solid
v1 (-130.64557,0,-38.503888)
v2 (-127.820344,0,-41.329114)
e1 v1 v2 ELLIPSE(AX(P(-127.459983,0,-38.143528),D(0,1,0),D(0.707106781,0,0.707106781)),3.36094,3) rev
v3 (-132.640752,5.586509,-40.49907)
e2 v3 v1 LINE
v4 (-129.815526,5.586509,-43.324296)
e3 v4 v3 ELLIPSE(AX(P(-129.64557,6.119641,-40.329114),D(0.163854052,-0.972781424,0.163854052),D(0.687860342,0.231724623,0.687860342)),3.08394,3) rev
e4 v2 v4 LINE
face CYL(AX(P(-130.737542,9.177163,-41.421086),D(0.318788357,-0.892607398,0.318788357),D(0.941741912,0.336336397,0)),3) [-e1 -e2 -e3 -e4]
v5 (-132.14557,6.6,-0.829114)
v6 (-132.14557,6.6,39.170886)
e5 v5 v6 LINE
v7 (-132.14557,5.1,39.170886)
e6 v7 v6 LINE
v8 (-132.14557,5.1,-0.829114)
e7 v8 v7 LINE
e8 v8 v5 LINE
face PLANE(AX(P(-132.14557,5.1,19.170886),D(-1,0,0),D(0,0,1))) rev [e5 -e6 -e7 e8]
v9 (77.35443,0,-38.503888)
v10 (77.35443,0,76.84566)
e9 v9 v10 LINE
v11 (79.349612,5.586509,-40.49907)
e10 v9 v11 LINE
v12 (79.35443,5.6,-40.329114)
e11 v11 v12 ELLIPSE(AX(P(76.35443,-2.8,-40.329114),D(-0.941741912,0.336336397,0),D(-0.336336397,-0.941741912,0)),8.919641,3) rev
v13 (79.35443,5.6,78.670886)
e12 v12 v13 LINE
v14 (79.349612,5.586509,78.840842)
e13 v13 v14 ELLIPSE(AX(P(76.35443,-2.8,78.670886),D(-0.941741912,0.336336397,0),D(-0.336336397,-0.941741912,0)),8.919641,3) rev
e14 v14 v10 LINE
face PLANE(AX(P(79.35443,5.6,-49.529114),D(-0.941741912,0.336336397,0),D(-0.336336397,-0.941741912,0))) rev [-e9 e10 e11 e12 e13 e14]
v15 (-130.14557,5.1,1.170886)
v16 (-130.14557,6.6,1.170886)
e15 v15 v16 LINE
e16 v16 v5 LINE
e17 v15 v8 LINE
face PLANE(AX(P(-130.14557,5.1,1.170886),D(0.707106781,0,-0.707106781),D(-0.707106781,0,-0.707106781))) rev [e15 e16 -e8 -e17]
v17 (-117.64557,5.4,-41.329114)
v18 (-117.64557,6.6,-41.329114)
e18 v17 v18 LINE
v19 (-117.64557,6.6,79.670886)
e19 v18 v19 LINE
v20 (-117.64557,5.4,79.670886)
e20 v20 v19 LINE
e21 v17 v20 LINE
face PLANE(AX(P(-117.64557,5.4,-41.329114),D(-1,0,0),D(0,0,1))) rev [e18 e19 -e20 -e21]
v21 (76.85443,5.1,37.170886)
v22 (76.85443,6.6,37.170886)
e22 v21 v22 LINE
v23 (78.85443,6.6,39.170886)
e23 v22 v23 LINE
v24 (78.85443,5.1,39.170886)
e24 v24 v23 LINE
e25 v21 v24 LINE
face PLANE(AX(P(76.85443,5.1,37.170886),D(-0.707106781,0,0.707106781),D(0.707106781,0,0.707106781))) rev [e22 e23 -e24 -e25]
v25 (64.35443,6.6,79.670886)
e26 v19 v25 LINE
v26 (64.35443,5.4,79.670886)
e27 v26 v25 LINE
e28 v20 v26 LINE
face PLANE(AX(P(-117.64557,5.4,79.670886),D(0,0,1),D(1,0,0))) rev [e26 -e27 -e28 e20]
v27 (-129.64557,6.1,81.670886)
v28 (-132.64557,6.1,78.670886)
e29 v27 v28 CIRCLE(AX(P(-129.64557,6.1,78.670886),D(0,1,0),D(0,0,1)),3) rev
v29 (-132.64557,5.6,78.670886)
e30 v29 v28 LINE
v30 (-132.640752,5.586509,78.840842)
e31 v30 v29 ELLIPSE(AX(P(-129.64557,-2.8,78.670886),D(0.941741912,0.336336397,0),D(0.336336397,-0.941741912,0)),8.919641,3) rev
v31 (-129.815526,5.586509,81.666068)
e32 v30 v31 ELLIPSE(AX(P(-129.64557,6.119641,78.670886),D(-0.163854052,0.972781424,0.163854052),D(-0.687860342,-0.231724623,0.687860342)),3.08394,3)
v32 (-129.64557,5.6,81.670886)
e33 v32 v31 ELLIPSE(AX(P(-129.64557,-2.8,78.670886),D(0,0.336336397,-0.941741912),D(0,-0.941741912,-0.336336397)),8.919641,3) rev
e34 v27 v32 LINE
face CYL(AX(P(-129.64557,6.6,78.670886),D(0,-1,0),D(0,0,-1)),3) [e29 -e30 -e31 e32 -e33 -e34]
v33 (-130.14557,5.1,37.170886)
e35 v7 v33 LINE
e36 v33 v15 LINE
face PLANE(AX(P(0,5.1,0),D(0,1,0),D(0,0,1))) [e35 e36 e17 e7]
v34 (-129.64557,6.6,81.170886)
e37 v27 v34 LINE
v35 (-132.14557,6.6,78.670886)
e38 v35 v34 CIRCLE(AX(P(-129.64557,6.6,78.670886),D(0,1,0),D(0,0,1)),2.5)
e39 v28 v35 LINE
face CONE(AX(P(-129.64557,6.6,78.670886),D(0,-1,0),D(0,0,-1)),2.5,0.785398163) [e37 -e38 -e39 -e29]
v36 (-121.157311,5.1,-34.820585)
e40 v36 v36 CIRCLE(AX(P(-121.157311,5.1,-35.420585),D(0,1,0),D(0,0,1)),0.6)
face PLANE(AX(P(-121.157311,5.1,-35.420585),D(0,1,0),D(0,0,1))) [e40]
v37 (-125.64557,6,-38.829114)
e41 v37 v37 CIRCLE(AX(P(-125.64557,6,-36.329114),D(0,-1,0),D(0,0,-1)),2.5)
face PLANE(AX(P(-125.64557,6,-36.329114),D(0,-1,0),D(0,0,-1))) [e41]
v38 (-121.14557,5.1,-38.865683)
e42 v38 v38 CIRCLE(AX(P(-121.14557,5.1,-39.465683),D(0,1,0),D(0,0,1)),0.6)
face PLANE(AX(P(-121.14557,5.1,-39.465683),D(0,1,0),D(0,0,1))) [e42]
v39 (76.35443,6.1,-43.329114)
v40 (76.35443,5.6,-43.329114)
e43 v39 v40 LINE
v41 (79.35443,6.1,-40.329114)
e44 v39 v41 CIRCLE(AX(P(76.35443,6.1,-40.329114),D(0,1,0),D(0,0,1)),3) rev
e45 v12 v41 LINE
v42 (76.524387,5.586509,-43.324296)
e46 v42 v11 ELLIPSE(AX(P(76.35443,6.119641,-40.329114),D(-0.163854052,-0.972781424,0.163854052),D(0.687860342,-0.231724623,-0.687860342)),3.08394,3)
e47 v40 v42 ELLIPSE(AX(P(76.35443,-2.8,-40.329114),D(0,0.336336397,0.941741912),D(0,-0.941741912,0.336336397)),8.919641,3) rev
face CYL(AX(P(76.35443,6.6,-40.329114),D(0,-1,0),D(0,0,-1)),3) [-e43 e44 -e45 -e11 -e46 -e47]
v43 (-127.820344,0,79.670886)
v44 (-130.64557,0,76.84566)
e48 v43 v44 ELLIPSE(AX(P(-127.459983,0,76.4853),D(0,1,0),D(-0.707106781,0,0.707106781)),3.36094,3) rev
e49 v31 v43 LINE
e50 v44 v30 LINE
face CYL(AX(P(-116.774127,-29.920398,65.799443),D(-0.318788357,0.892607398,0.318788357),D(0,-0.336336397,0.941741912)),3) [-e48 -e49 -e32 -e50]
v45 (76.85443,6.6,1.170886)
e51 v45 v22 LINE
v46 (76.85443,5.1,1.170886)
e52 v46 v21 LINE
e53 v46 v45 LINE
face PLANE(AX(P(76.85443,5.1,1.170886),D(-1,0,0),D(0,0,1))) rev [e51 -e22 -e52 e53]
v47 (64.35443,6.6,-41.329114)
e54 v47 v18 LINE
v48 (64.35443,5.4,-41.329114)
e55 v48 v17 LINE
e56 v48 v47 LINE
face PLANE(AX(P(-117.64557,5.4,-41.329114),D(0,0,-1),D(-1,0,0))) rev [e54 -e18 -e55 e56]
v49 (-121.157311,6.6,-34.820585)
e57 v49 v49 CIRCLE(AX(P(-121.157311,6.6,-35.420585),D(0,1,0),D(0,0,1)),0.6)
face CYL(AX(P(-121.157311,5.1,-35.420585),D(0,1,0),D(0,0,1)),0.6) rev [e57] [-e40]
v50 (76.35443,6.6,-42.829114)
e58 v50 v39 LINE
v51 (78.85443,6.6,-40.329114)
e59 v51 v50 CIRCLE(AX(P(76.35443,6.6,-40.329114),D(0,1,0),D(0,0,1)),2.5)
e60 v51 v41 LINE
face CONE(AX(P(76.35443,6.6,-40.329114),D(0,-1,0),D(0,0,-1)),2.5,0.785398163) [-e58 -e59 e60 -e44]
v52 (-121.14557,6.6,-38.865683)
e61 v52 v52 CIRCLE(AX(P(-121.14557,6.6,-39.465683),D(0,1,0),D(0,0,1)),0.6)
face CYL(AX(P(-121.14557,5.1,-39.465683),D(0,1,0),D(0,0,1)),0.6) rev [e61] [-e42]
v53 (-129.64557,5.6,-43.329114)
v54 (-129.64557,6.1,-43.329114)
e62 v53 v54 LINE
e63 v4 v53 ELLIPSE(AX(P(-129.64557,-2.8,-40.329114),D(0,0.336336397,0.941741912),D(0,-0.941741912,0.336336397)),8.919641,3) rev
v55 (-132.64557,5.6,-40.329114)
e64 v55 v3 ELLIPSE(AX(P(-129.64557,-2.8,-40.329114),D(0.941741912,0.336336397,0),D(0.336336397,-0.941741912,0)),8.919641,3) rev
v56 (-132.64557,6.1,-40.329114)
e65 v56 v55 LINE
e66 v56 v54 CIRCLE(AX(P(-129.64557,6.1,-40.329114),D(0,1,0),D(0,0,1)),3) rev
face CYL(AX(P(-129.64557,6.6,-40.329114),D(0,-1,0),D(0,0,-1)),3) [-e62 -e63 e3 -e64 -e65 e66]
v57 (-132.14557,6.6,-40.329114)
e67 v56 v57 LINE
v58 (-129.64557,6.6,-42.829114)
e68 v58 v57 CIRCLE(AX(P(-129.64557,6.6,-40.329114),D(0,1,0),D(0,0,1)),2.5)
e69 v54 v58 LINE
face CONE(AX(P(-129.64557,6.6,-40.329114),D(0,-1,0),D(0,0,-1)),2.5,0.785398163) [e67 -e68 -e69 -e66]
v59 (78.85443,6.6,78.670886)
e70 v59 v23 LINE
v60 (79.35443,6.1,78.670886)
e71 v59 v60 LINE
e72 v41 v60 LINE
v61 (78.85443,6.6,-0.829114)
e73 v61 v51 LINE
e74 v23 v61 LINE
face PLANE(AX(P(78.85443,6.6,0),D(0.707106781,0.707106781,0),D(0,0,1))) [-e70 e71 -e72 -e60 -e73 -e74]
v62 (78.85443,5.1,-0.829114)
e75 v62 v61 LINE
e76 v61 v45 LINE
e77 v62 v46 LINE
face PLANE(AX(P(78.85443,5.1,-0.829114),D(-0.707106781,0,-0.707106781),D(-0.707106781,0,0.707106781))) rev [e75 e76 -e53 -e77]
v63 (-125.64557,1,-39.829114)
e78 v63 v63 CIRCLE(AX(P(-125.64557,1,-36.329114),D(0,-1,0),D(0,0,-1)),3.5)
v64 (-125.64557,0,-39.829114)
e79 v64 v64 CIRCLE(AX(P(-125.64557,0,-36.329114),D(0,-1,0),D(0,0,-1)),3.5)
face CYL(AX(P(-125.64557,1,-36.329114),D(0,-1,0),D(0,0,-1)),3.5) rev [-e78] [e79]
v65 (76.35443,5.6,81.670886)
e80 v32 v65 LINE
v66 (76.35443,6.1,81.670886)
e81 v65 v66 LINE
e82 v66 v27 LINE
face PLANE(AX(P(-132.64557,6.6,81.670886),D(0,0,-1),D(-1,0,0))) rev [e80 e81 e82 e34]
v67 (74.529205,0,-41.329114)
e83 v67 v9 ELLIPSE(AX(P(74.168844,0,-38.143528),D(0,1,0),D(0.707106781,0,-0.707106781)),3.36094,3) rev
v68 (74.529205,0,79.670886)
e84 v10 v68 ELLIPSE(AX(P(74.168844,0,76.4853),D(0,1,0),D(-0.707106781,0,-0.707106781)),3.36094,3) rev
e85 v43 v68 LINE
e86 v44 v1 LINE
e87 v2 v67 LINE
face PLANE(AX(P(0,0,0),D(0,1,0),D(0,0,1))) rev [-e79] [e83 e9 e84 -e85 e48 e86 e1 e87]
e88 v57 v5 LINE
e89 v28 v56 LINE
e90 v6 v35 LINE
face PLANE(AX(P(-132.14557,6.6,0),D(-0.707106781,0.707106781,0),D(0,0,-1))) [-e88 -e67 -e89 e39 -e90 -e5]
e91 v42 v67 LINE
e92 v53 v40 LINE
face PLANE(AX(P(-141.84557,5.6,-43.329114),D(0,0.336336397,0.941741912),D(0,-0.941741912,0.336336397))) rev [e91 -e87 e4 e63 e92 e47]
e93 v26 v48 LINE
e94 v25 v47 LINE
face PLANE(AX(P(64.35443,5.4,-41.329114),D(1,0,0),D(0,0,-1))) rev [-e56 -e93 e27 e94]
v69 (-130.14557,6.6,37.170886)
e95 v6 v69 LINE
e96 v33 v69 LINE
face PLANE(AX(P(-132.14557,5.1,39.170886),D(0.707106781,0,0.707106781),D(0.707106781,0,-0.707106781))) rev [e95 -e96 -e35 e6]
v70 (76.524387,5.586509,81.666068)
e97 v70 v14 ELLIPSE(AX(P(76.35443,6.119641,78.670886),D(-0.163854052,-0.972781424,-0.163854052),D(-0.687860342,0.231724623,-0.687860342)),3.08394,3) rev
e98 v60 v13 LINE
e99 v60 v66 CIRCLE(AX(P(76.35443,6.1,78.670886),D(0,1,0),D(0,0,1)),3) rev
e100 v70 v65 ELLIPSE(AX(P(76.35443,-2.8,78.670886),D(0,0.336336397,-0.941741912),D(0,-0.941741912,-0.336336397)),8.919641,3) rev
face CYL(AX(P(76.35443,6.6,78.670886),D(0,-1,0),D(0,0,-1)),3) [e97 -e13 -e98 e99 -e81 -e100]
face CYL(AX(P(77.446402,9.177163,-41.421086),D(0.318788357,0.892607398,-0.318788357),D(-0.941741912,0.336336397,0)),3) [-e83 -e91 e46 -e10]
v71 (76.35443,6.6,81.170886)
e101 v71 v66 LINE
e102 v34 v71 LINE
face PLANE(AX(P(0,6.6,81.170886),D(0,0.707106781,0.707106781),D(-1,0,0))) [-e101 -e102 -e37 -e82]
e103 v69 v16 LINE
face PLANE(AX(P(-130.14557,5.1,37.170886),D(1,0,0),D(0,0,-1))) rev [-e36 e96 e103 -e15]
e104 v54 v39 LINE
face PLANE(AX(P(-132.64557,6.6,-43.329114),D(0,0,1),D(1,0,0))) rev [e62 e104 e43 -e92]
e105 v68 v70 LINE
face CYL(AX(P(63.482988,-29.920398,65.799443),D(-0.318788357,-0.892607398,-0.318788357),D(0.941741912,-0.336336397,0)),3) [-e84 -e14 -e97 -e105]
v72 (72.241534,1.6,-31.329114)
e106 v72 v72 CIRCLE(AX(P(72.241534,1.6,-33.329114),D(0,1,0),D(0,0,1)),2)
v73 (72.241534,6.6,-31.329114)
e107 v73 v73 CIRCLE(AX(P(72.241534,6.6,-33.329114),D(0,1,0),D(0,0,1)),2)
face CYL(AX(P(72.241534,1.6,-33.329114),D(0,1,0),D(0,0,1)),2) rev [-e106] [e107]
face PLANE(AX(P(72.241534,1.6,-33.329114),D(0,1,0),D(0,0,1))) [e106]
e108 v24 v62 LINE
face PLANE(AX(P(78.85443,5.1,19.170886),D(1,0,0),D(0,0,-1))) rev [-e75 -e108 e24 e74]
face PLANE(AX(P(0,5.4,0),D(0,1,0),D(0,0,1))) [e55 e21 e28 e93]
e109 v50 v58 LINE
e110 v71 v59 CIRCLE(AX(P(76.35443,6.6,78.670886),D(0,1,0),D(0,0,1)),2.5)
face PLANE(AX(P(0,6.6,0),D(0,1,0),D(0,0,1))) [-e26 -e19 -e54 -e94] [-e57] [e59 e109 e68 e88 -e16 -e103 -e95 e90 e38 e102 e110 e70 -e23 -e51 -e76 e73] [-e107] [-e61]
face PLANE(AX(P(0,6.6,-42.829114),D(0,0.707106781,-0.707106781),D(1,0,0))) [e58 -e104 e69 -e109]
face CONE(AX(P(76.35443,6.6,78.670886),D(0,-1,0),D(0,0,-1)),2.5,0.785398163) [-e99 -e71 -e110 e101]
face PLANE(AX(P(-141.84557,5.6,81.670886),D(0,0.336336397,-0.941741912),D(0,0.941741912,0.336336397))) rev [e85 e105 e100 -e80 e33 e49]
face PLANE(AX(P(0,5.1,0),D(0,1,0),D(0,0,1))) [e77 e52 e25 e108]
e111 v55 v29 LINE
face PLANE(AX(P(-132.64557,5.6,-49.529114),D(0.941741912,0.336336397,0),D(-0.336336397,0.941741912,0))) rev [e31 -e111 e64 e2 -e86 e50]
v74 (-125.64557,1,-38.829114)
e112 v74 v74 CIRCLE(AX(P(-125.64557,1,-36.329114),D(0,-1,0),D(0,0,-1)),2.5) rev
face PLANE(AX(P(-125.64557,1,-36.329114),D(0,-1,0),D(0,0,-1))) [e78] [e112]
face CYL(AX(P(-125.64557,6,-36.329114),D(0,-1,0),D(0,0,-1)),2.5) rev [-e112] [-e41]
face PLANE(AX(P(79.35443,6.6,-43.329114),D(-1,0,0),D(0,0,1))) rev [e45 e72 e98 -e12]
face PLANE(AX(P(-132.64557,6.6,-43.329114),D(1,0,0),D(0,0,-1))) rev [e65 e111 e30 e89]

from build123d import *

# Parameters (mm, degrees)
SKETCH1_W           = 212
SKETCH1_H           = 125
BOSS_EXTRUDE1_DEPTH = 6.6
SKETCH2_W           = 182
SKETCH2_H           = 121
CUT_EXTRUDE1_DEPTH  = 1.2
CUT_EXTRUDE2_DEPTH  = 131.2
CUT_EXTRUDE3_DEPTH  = 131.2
CUT_EXTRUDE4_DEPTH  = 221.2
CUT_EXTRUDE5_DEPTH  = 221.2
FILLET1_R           = 3
SKETCH7_R           = 2.5
CUT_EXTRUDE6_DEPTH  = 6
SKETCH8_R           = 3.5
CUT_EXTRUDE7_DEPTH  = 1
SKETCH9_R           = 2
CUT_EXTRUDE8_DEPTH  = 5
SKETCH10_R          = 0.6
CUT_EXTRUDE9_DEPTH  = 1.5
CHAMFER1_SIZE       = 0.5
CUT_EXTRUDE10_DEPTH = 1.5
CUT_EXTRUDE11_DEPTH = 1.5


with BuildPart() as part:
    # Sketch1 → Boss-Extrude1 (new body)
    with BuildSketch(Plane(origin=(0, 0, 0), x_dir=(1, 0, 0), z_dir=(0, 1, 0))):
        with Locations((-26.64556962, -19.170886076)):
            Rectangle(SKETCH1_W, SKETCH1_H)
    extrude(amount=BOSS_EXTRUDE1_DEPTH)

    # Sketch2 → Cut-Extrude1 (cut)
    with BuildSketch(Plane(origin=(0, 6.6, 0), x_dir=(1, 0, 0), z_dir=(0, 1, 0))):
        with Locations((-26.64556962, -19.170886076)):
            Rectangle(SKETCH2_W, SKETCH2_H)
    extrude(amount=-CUT_EXTRUDE1_DEPTH, mode=Mode.SUBTRACT)

    # Sketch3 → Cut-Extrude2 (cut)
    with BuildSketch(Plane.XY.offset(81.670886076)):
        Polygon((-132.64556962, 5.6), (-130.64556962, 0), (-132.64556962, 0), align=None)
    extrude(amount=-CUT_EXTRUDE2_DEPTH, mode=Mode.SUBTRACT)

    # Sketch4 → Cut-Extrude3 (cut)
    with BuildSketch(Plane.XY.offset(81.670886076)):
        Polygon((79.35443038, 5.6), (77.35443038, 0), (79.35443038, 0), align=None)
    extrude(amount=-CUT_EXTRUDE3_DEPTH, mode=Mode.SUBTRACT)

    # Sketch5 → Cut-Extrude4 (cut)
    with BuildSketch(Plane(origin=(79.35443038, 0, 0), x_dir=(0, 0, -1), z_dir=(1, 0, 0))):
        Polygon((-81.670886076, 5.6), (-79.670886076, 0), (-81.670886076, 0), align=None)
    extrude(amount=-CUT_EXTRUDE4_DEPTH, mode=Mode.SUBTRACT)

    # Sketch6 → Cut-Extrude5 (cut)
    with BuildSketch(Plane(origin=(79.35443038, 0, 0), x_dir=(0, 0, -1), z_dir=(1, 0, 0))):
        Polygon((43.329113924, 5.6), (41.329113924, 0), (43.329113924, 0), align=None)
    extrude(amount=-CUT_EXTRUDE5_DEPTH, mode=Mode.SUBTRACT)

    # Fillet1
    # the kernel refuses this fillet: 3 mm, written as the material it takes off along each edge
    with BuildSketch(Plane(origin=(75.220284038, -5.975609756, 77.536739734), x_dir=(0.1072201272408216, 0.30021635627431204, -0.9478259248088952), z_dir=(0.3187883565316692, 0.8926073982886735, 0.31878835653166915)), Plane(origin=(75.220284038, -5.975609756, -39.194967583), x_dir=(-0.9478259248088952, 0.30021635627431126, -0.10722012724082396), z_dir=(0.31878835653166926, 0.892607398288674, -0.3187883565316682))) as fillet1_piece_1:
        with BuildLine():
            CenterArc((FILLET1_R * 0.892607398289, FILLET1_R), FILLET1_R, 186.495326626, 83.504673374)
            Line((-FILLET1_R * 0.100973687589, FILLET1_R * 0.886877828054), (0, 0))
            Line((0, 0), (FILLET1_R * 0.892607398289, 0))
        make_face()
    extrude(amount=19.662865831, mode=Mode.SUBTRACT)
    with BuildSketch(Plane(origin=(-128.511423279, -5.975609756, 77.536739734), x_dir=(-0.10722012724082589, 0.30021635627431054, -0.947825924808895), z_dir=(-0.3187883565316692, 0.8926073982886735, 0.31878835653166926)), Plane(origin=(-128.511423279, -5.975609756, -39.194967583), x_dir=(0.9478259248088952, 0.30021635627431037, -0.10722012724082654), z_dir=(-0.31878835653166926, 0.892607398288674, -0.3187883565316681))) as fillet1_piece_2:
        with BuildLine():
            CenterArc((FILLET1_R * 0.892607398289, -FILLET1_R), FILLET1_R, 90, 83.504673374)
            Line((-FILLET1_R * 0.100973687589, -FILLET1_R * 0.886877828054), (0, 0))
            Line((0, 0), (FILLET1_R * 0.892607398289, 0))
        make_face()
    extrude(amount=19.662865831, mode=Mode.SUBTRACT)
    with BuildSketch(Plane(origin=(-132.64556962, -1.9, -43.329113924), x_dir=(1, 0, 0), z_dir=(0, 1, 0)), Plane(origin=(-132.64556962, -1.9, 81.670886076), x_dir=(0, 0, -1), z_dir=(0, 1, 0))) as fillet1_piece_3:
        with BuildLine():
            CenterArc((FILLET1_R, -FILLET1_R), FILLET1_R, 90, 90)
            Line((0, -FILLET1_R), (0, 0))
            Line((0, 0), (FILLET1_R, 0))
        make_face()
    extrude(amount=16, mode=Mode.SUBTRACT)
    with BuildSketch(Plane(origin=(79.35443038, -1.9, -43.329113924), x_dir=(-1, 0, 0), z_dir=(0, 1, 0)), Plane(origin=(79.35443038, -1.9, 81.670886076), x_dir=(0, 0, -1), z_dir=(0, 1, 0))) as fillet1_piece_4:
        with BuildLine():
            CenterArc((FILLET1_R, FILLET1_R), FILLET1_R, 180, 90)
            Line((0, FILLET1_R), (0, 0))
            Line((0, 0), (FILLET1_R, 0))
        make_face()
    extrude(amount=16, mode=Mode.SUBTRACT)

    # Sketch7 → Cut-Extrude6 (cut)
    with BuildSketch(Plane.XZ):
        with Locations(Location((-125.64556962, -36.329113924, 0), (0, 0, 270))):
            Circle(SKETCH7_R)
    extrude(amount=-CUT_EXTRUDE6_DEPTH, mode=Mode.SUBTRACT)

    # Sketch8 → Cut-Extrude7 (cut)
    with BuildSketch(Plane.XZ):
        with Locations(Location((-125.64556962, -36.329113924, 0), (0, 0, 270))):
            Circle(SKETCH8_R)
    extrude(amount=-CUT_EXTRUDE7_DEPTH, mode=Mode.SUBTRACT)

    # Sketch9 → Cut-Extrude8 (cut)
    with BuildSketch(Plane(origin=(0, 6.6, 0), x_dir=(1, 0, 0), z_dir=(0, 1, 0))):
        with Locations(Location((72.241534247, 33.329113924, 0), (0, 0, 270))):
            Circle(SKETCH9_R)
    extrude(amount=-CUT_EXTRUDE8_DEPTH, mode=Mode.SUBTRACT)

    # Sketch10 → Cut-Extrude9 (cut)
    with BuildSketch(Plane(origin=(0, 6.6, 0), x_dir=(1, 0, 0), z_dir=(0, 1, 0))):
        with Locations(Location((-121.14556962, 39.465683386, 0), (0, 0, 270))):
            Circle(SKETCH10_R)
        with Locations(Location((-121.157311089, 35.420585215, 0), (0, 0, 270))):
            Circle(SKETCH10_R)
    extrude(amount=-CUT_EXTRUDE9_DEPTH, mode=Mode.SUBTRACT)

    # Chamfer1
    chamfer1_edges = [part.edges().sort_by_distance(p)[0] for p in [
        (-132.64556962, 6.6, 19.170886076),
        (-26.64556962, 6.6, -43.329113924),
        (-26.64556962, 6.6, 81.670886076),
        (79.35443038, 6.6, 19.170886076),
        (78.475750723, 6.6, -42.450434268),
        (78.475750723, 6.6, 80.79220642),
        (-131.766889964, 6.6, 80.79220642),
        (-131.766889964, 6.6, -42.450434268),
    ]]
    chamfer(chamfer1_edges, length=CHAMFER1_SIZE)

    # Sketch11 → Cut-Extrude10 (cut)
    with BuildSketch(Plane(origin=(0, 6.6, 0), x_dir=(1, 0, 0), z_dir=(0, 1, 0))):
        Polygon((-132.14556962, -19.170886076), (-132.14556962, -39.170886076), (-130.14556962, -37.170886076), (-130.14556962, -1.170886076), (-132.14556962, 0.829113924), align=None)
    extrude(amount=-CUT_EXTRUDE10_DEPTH, mode=Mode.SUBTRACT)

    # Sketch12 → Cut-Extrude11 (cut)
    with BuildSketch(Plane(origin=(0, 6.6, 0), x_dir=(1, 0, 0), z_dir=(0, 1, 0))):
        Polygon((78.85443038, -19.170886076), (78.85443038, 0.829113924), (76.85443038, -1.170886076), (76.85443038, -37.170886076), (78.85443038, -39.170886076), align=None)
    extrude(amount=-CUT_EXTRUDE11_DEPTH, mode=Mode.SUBTRACT)


solid = part.part
